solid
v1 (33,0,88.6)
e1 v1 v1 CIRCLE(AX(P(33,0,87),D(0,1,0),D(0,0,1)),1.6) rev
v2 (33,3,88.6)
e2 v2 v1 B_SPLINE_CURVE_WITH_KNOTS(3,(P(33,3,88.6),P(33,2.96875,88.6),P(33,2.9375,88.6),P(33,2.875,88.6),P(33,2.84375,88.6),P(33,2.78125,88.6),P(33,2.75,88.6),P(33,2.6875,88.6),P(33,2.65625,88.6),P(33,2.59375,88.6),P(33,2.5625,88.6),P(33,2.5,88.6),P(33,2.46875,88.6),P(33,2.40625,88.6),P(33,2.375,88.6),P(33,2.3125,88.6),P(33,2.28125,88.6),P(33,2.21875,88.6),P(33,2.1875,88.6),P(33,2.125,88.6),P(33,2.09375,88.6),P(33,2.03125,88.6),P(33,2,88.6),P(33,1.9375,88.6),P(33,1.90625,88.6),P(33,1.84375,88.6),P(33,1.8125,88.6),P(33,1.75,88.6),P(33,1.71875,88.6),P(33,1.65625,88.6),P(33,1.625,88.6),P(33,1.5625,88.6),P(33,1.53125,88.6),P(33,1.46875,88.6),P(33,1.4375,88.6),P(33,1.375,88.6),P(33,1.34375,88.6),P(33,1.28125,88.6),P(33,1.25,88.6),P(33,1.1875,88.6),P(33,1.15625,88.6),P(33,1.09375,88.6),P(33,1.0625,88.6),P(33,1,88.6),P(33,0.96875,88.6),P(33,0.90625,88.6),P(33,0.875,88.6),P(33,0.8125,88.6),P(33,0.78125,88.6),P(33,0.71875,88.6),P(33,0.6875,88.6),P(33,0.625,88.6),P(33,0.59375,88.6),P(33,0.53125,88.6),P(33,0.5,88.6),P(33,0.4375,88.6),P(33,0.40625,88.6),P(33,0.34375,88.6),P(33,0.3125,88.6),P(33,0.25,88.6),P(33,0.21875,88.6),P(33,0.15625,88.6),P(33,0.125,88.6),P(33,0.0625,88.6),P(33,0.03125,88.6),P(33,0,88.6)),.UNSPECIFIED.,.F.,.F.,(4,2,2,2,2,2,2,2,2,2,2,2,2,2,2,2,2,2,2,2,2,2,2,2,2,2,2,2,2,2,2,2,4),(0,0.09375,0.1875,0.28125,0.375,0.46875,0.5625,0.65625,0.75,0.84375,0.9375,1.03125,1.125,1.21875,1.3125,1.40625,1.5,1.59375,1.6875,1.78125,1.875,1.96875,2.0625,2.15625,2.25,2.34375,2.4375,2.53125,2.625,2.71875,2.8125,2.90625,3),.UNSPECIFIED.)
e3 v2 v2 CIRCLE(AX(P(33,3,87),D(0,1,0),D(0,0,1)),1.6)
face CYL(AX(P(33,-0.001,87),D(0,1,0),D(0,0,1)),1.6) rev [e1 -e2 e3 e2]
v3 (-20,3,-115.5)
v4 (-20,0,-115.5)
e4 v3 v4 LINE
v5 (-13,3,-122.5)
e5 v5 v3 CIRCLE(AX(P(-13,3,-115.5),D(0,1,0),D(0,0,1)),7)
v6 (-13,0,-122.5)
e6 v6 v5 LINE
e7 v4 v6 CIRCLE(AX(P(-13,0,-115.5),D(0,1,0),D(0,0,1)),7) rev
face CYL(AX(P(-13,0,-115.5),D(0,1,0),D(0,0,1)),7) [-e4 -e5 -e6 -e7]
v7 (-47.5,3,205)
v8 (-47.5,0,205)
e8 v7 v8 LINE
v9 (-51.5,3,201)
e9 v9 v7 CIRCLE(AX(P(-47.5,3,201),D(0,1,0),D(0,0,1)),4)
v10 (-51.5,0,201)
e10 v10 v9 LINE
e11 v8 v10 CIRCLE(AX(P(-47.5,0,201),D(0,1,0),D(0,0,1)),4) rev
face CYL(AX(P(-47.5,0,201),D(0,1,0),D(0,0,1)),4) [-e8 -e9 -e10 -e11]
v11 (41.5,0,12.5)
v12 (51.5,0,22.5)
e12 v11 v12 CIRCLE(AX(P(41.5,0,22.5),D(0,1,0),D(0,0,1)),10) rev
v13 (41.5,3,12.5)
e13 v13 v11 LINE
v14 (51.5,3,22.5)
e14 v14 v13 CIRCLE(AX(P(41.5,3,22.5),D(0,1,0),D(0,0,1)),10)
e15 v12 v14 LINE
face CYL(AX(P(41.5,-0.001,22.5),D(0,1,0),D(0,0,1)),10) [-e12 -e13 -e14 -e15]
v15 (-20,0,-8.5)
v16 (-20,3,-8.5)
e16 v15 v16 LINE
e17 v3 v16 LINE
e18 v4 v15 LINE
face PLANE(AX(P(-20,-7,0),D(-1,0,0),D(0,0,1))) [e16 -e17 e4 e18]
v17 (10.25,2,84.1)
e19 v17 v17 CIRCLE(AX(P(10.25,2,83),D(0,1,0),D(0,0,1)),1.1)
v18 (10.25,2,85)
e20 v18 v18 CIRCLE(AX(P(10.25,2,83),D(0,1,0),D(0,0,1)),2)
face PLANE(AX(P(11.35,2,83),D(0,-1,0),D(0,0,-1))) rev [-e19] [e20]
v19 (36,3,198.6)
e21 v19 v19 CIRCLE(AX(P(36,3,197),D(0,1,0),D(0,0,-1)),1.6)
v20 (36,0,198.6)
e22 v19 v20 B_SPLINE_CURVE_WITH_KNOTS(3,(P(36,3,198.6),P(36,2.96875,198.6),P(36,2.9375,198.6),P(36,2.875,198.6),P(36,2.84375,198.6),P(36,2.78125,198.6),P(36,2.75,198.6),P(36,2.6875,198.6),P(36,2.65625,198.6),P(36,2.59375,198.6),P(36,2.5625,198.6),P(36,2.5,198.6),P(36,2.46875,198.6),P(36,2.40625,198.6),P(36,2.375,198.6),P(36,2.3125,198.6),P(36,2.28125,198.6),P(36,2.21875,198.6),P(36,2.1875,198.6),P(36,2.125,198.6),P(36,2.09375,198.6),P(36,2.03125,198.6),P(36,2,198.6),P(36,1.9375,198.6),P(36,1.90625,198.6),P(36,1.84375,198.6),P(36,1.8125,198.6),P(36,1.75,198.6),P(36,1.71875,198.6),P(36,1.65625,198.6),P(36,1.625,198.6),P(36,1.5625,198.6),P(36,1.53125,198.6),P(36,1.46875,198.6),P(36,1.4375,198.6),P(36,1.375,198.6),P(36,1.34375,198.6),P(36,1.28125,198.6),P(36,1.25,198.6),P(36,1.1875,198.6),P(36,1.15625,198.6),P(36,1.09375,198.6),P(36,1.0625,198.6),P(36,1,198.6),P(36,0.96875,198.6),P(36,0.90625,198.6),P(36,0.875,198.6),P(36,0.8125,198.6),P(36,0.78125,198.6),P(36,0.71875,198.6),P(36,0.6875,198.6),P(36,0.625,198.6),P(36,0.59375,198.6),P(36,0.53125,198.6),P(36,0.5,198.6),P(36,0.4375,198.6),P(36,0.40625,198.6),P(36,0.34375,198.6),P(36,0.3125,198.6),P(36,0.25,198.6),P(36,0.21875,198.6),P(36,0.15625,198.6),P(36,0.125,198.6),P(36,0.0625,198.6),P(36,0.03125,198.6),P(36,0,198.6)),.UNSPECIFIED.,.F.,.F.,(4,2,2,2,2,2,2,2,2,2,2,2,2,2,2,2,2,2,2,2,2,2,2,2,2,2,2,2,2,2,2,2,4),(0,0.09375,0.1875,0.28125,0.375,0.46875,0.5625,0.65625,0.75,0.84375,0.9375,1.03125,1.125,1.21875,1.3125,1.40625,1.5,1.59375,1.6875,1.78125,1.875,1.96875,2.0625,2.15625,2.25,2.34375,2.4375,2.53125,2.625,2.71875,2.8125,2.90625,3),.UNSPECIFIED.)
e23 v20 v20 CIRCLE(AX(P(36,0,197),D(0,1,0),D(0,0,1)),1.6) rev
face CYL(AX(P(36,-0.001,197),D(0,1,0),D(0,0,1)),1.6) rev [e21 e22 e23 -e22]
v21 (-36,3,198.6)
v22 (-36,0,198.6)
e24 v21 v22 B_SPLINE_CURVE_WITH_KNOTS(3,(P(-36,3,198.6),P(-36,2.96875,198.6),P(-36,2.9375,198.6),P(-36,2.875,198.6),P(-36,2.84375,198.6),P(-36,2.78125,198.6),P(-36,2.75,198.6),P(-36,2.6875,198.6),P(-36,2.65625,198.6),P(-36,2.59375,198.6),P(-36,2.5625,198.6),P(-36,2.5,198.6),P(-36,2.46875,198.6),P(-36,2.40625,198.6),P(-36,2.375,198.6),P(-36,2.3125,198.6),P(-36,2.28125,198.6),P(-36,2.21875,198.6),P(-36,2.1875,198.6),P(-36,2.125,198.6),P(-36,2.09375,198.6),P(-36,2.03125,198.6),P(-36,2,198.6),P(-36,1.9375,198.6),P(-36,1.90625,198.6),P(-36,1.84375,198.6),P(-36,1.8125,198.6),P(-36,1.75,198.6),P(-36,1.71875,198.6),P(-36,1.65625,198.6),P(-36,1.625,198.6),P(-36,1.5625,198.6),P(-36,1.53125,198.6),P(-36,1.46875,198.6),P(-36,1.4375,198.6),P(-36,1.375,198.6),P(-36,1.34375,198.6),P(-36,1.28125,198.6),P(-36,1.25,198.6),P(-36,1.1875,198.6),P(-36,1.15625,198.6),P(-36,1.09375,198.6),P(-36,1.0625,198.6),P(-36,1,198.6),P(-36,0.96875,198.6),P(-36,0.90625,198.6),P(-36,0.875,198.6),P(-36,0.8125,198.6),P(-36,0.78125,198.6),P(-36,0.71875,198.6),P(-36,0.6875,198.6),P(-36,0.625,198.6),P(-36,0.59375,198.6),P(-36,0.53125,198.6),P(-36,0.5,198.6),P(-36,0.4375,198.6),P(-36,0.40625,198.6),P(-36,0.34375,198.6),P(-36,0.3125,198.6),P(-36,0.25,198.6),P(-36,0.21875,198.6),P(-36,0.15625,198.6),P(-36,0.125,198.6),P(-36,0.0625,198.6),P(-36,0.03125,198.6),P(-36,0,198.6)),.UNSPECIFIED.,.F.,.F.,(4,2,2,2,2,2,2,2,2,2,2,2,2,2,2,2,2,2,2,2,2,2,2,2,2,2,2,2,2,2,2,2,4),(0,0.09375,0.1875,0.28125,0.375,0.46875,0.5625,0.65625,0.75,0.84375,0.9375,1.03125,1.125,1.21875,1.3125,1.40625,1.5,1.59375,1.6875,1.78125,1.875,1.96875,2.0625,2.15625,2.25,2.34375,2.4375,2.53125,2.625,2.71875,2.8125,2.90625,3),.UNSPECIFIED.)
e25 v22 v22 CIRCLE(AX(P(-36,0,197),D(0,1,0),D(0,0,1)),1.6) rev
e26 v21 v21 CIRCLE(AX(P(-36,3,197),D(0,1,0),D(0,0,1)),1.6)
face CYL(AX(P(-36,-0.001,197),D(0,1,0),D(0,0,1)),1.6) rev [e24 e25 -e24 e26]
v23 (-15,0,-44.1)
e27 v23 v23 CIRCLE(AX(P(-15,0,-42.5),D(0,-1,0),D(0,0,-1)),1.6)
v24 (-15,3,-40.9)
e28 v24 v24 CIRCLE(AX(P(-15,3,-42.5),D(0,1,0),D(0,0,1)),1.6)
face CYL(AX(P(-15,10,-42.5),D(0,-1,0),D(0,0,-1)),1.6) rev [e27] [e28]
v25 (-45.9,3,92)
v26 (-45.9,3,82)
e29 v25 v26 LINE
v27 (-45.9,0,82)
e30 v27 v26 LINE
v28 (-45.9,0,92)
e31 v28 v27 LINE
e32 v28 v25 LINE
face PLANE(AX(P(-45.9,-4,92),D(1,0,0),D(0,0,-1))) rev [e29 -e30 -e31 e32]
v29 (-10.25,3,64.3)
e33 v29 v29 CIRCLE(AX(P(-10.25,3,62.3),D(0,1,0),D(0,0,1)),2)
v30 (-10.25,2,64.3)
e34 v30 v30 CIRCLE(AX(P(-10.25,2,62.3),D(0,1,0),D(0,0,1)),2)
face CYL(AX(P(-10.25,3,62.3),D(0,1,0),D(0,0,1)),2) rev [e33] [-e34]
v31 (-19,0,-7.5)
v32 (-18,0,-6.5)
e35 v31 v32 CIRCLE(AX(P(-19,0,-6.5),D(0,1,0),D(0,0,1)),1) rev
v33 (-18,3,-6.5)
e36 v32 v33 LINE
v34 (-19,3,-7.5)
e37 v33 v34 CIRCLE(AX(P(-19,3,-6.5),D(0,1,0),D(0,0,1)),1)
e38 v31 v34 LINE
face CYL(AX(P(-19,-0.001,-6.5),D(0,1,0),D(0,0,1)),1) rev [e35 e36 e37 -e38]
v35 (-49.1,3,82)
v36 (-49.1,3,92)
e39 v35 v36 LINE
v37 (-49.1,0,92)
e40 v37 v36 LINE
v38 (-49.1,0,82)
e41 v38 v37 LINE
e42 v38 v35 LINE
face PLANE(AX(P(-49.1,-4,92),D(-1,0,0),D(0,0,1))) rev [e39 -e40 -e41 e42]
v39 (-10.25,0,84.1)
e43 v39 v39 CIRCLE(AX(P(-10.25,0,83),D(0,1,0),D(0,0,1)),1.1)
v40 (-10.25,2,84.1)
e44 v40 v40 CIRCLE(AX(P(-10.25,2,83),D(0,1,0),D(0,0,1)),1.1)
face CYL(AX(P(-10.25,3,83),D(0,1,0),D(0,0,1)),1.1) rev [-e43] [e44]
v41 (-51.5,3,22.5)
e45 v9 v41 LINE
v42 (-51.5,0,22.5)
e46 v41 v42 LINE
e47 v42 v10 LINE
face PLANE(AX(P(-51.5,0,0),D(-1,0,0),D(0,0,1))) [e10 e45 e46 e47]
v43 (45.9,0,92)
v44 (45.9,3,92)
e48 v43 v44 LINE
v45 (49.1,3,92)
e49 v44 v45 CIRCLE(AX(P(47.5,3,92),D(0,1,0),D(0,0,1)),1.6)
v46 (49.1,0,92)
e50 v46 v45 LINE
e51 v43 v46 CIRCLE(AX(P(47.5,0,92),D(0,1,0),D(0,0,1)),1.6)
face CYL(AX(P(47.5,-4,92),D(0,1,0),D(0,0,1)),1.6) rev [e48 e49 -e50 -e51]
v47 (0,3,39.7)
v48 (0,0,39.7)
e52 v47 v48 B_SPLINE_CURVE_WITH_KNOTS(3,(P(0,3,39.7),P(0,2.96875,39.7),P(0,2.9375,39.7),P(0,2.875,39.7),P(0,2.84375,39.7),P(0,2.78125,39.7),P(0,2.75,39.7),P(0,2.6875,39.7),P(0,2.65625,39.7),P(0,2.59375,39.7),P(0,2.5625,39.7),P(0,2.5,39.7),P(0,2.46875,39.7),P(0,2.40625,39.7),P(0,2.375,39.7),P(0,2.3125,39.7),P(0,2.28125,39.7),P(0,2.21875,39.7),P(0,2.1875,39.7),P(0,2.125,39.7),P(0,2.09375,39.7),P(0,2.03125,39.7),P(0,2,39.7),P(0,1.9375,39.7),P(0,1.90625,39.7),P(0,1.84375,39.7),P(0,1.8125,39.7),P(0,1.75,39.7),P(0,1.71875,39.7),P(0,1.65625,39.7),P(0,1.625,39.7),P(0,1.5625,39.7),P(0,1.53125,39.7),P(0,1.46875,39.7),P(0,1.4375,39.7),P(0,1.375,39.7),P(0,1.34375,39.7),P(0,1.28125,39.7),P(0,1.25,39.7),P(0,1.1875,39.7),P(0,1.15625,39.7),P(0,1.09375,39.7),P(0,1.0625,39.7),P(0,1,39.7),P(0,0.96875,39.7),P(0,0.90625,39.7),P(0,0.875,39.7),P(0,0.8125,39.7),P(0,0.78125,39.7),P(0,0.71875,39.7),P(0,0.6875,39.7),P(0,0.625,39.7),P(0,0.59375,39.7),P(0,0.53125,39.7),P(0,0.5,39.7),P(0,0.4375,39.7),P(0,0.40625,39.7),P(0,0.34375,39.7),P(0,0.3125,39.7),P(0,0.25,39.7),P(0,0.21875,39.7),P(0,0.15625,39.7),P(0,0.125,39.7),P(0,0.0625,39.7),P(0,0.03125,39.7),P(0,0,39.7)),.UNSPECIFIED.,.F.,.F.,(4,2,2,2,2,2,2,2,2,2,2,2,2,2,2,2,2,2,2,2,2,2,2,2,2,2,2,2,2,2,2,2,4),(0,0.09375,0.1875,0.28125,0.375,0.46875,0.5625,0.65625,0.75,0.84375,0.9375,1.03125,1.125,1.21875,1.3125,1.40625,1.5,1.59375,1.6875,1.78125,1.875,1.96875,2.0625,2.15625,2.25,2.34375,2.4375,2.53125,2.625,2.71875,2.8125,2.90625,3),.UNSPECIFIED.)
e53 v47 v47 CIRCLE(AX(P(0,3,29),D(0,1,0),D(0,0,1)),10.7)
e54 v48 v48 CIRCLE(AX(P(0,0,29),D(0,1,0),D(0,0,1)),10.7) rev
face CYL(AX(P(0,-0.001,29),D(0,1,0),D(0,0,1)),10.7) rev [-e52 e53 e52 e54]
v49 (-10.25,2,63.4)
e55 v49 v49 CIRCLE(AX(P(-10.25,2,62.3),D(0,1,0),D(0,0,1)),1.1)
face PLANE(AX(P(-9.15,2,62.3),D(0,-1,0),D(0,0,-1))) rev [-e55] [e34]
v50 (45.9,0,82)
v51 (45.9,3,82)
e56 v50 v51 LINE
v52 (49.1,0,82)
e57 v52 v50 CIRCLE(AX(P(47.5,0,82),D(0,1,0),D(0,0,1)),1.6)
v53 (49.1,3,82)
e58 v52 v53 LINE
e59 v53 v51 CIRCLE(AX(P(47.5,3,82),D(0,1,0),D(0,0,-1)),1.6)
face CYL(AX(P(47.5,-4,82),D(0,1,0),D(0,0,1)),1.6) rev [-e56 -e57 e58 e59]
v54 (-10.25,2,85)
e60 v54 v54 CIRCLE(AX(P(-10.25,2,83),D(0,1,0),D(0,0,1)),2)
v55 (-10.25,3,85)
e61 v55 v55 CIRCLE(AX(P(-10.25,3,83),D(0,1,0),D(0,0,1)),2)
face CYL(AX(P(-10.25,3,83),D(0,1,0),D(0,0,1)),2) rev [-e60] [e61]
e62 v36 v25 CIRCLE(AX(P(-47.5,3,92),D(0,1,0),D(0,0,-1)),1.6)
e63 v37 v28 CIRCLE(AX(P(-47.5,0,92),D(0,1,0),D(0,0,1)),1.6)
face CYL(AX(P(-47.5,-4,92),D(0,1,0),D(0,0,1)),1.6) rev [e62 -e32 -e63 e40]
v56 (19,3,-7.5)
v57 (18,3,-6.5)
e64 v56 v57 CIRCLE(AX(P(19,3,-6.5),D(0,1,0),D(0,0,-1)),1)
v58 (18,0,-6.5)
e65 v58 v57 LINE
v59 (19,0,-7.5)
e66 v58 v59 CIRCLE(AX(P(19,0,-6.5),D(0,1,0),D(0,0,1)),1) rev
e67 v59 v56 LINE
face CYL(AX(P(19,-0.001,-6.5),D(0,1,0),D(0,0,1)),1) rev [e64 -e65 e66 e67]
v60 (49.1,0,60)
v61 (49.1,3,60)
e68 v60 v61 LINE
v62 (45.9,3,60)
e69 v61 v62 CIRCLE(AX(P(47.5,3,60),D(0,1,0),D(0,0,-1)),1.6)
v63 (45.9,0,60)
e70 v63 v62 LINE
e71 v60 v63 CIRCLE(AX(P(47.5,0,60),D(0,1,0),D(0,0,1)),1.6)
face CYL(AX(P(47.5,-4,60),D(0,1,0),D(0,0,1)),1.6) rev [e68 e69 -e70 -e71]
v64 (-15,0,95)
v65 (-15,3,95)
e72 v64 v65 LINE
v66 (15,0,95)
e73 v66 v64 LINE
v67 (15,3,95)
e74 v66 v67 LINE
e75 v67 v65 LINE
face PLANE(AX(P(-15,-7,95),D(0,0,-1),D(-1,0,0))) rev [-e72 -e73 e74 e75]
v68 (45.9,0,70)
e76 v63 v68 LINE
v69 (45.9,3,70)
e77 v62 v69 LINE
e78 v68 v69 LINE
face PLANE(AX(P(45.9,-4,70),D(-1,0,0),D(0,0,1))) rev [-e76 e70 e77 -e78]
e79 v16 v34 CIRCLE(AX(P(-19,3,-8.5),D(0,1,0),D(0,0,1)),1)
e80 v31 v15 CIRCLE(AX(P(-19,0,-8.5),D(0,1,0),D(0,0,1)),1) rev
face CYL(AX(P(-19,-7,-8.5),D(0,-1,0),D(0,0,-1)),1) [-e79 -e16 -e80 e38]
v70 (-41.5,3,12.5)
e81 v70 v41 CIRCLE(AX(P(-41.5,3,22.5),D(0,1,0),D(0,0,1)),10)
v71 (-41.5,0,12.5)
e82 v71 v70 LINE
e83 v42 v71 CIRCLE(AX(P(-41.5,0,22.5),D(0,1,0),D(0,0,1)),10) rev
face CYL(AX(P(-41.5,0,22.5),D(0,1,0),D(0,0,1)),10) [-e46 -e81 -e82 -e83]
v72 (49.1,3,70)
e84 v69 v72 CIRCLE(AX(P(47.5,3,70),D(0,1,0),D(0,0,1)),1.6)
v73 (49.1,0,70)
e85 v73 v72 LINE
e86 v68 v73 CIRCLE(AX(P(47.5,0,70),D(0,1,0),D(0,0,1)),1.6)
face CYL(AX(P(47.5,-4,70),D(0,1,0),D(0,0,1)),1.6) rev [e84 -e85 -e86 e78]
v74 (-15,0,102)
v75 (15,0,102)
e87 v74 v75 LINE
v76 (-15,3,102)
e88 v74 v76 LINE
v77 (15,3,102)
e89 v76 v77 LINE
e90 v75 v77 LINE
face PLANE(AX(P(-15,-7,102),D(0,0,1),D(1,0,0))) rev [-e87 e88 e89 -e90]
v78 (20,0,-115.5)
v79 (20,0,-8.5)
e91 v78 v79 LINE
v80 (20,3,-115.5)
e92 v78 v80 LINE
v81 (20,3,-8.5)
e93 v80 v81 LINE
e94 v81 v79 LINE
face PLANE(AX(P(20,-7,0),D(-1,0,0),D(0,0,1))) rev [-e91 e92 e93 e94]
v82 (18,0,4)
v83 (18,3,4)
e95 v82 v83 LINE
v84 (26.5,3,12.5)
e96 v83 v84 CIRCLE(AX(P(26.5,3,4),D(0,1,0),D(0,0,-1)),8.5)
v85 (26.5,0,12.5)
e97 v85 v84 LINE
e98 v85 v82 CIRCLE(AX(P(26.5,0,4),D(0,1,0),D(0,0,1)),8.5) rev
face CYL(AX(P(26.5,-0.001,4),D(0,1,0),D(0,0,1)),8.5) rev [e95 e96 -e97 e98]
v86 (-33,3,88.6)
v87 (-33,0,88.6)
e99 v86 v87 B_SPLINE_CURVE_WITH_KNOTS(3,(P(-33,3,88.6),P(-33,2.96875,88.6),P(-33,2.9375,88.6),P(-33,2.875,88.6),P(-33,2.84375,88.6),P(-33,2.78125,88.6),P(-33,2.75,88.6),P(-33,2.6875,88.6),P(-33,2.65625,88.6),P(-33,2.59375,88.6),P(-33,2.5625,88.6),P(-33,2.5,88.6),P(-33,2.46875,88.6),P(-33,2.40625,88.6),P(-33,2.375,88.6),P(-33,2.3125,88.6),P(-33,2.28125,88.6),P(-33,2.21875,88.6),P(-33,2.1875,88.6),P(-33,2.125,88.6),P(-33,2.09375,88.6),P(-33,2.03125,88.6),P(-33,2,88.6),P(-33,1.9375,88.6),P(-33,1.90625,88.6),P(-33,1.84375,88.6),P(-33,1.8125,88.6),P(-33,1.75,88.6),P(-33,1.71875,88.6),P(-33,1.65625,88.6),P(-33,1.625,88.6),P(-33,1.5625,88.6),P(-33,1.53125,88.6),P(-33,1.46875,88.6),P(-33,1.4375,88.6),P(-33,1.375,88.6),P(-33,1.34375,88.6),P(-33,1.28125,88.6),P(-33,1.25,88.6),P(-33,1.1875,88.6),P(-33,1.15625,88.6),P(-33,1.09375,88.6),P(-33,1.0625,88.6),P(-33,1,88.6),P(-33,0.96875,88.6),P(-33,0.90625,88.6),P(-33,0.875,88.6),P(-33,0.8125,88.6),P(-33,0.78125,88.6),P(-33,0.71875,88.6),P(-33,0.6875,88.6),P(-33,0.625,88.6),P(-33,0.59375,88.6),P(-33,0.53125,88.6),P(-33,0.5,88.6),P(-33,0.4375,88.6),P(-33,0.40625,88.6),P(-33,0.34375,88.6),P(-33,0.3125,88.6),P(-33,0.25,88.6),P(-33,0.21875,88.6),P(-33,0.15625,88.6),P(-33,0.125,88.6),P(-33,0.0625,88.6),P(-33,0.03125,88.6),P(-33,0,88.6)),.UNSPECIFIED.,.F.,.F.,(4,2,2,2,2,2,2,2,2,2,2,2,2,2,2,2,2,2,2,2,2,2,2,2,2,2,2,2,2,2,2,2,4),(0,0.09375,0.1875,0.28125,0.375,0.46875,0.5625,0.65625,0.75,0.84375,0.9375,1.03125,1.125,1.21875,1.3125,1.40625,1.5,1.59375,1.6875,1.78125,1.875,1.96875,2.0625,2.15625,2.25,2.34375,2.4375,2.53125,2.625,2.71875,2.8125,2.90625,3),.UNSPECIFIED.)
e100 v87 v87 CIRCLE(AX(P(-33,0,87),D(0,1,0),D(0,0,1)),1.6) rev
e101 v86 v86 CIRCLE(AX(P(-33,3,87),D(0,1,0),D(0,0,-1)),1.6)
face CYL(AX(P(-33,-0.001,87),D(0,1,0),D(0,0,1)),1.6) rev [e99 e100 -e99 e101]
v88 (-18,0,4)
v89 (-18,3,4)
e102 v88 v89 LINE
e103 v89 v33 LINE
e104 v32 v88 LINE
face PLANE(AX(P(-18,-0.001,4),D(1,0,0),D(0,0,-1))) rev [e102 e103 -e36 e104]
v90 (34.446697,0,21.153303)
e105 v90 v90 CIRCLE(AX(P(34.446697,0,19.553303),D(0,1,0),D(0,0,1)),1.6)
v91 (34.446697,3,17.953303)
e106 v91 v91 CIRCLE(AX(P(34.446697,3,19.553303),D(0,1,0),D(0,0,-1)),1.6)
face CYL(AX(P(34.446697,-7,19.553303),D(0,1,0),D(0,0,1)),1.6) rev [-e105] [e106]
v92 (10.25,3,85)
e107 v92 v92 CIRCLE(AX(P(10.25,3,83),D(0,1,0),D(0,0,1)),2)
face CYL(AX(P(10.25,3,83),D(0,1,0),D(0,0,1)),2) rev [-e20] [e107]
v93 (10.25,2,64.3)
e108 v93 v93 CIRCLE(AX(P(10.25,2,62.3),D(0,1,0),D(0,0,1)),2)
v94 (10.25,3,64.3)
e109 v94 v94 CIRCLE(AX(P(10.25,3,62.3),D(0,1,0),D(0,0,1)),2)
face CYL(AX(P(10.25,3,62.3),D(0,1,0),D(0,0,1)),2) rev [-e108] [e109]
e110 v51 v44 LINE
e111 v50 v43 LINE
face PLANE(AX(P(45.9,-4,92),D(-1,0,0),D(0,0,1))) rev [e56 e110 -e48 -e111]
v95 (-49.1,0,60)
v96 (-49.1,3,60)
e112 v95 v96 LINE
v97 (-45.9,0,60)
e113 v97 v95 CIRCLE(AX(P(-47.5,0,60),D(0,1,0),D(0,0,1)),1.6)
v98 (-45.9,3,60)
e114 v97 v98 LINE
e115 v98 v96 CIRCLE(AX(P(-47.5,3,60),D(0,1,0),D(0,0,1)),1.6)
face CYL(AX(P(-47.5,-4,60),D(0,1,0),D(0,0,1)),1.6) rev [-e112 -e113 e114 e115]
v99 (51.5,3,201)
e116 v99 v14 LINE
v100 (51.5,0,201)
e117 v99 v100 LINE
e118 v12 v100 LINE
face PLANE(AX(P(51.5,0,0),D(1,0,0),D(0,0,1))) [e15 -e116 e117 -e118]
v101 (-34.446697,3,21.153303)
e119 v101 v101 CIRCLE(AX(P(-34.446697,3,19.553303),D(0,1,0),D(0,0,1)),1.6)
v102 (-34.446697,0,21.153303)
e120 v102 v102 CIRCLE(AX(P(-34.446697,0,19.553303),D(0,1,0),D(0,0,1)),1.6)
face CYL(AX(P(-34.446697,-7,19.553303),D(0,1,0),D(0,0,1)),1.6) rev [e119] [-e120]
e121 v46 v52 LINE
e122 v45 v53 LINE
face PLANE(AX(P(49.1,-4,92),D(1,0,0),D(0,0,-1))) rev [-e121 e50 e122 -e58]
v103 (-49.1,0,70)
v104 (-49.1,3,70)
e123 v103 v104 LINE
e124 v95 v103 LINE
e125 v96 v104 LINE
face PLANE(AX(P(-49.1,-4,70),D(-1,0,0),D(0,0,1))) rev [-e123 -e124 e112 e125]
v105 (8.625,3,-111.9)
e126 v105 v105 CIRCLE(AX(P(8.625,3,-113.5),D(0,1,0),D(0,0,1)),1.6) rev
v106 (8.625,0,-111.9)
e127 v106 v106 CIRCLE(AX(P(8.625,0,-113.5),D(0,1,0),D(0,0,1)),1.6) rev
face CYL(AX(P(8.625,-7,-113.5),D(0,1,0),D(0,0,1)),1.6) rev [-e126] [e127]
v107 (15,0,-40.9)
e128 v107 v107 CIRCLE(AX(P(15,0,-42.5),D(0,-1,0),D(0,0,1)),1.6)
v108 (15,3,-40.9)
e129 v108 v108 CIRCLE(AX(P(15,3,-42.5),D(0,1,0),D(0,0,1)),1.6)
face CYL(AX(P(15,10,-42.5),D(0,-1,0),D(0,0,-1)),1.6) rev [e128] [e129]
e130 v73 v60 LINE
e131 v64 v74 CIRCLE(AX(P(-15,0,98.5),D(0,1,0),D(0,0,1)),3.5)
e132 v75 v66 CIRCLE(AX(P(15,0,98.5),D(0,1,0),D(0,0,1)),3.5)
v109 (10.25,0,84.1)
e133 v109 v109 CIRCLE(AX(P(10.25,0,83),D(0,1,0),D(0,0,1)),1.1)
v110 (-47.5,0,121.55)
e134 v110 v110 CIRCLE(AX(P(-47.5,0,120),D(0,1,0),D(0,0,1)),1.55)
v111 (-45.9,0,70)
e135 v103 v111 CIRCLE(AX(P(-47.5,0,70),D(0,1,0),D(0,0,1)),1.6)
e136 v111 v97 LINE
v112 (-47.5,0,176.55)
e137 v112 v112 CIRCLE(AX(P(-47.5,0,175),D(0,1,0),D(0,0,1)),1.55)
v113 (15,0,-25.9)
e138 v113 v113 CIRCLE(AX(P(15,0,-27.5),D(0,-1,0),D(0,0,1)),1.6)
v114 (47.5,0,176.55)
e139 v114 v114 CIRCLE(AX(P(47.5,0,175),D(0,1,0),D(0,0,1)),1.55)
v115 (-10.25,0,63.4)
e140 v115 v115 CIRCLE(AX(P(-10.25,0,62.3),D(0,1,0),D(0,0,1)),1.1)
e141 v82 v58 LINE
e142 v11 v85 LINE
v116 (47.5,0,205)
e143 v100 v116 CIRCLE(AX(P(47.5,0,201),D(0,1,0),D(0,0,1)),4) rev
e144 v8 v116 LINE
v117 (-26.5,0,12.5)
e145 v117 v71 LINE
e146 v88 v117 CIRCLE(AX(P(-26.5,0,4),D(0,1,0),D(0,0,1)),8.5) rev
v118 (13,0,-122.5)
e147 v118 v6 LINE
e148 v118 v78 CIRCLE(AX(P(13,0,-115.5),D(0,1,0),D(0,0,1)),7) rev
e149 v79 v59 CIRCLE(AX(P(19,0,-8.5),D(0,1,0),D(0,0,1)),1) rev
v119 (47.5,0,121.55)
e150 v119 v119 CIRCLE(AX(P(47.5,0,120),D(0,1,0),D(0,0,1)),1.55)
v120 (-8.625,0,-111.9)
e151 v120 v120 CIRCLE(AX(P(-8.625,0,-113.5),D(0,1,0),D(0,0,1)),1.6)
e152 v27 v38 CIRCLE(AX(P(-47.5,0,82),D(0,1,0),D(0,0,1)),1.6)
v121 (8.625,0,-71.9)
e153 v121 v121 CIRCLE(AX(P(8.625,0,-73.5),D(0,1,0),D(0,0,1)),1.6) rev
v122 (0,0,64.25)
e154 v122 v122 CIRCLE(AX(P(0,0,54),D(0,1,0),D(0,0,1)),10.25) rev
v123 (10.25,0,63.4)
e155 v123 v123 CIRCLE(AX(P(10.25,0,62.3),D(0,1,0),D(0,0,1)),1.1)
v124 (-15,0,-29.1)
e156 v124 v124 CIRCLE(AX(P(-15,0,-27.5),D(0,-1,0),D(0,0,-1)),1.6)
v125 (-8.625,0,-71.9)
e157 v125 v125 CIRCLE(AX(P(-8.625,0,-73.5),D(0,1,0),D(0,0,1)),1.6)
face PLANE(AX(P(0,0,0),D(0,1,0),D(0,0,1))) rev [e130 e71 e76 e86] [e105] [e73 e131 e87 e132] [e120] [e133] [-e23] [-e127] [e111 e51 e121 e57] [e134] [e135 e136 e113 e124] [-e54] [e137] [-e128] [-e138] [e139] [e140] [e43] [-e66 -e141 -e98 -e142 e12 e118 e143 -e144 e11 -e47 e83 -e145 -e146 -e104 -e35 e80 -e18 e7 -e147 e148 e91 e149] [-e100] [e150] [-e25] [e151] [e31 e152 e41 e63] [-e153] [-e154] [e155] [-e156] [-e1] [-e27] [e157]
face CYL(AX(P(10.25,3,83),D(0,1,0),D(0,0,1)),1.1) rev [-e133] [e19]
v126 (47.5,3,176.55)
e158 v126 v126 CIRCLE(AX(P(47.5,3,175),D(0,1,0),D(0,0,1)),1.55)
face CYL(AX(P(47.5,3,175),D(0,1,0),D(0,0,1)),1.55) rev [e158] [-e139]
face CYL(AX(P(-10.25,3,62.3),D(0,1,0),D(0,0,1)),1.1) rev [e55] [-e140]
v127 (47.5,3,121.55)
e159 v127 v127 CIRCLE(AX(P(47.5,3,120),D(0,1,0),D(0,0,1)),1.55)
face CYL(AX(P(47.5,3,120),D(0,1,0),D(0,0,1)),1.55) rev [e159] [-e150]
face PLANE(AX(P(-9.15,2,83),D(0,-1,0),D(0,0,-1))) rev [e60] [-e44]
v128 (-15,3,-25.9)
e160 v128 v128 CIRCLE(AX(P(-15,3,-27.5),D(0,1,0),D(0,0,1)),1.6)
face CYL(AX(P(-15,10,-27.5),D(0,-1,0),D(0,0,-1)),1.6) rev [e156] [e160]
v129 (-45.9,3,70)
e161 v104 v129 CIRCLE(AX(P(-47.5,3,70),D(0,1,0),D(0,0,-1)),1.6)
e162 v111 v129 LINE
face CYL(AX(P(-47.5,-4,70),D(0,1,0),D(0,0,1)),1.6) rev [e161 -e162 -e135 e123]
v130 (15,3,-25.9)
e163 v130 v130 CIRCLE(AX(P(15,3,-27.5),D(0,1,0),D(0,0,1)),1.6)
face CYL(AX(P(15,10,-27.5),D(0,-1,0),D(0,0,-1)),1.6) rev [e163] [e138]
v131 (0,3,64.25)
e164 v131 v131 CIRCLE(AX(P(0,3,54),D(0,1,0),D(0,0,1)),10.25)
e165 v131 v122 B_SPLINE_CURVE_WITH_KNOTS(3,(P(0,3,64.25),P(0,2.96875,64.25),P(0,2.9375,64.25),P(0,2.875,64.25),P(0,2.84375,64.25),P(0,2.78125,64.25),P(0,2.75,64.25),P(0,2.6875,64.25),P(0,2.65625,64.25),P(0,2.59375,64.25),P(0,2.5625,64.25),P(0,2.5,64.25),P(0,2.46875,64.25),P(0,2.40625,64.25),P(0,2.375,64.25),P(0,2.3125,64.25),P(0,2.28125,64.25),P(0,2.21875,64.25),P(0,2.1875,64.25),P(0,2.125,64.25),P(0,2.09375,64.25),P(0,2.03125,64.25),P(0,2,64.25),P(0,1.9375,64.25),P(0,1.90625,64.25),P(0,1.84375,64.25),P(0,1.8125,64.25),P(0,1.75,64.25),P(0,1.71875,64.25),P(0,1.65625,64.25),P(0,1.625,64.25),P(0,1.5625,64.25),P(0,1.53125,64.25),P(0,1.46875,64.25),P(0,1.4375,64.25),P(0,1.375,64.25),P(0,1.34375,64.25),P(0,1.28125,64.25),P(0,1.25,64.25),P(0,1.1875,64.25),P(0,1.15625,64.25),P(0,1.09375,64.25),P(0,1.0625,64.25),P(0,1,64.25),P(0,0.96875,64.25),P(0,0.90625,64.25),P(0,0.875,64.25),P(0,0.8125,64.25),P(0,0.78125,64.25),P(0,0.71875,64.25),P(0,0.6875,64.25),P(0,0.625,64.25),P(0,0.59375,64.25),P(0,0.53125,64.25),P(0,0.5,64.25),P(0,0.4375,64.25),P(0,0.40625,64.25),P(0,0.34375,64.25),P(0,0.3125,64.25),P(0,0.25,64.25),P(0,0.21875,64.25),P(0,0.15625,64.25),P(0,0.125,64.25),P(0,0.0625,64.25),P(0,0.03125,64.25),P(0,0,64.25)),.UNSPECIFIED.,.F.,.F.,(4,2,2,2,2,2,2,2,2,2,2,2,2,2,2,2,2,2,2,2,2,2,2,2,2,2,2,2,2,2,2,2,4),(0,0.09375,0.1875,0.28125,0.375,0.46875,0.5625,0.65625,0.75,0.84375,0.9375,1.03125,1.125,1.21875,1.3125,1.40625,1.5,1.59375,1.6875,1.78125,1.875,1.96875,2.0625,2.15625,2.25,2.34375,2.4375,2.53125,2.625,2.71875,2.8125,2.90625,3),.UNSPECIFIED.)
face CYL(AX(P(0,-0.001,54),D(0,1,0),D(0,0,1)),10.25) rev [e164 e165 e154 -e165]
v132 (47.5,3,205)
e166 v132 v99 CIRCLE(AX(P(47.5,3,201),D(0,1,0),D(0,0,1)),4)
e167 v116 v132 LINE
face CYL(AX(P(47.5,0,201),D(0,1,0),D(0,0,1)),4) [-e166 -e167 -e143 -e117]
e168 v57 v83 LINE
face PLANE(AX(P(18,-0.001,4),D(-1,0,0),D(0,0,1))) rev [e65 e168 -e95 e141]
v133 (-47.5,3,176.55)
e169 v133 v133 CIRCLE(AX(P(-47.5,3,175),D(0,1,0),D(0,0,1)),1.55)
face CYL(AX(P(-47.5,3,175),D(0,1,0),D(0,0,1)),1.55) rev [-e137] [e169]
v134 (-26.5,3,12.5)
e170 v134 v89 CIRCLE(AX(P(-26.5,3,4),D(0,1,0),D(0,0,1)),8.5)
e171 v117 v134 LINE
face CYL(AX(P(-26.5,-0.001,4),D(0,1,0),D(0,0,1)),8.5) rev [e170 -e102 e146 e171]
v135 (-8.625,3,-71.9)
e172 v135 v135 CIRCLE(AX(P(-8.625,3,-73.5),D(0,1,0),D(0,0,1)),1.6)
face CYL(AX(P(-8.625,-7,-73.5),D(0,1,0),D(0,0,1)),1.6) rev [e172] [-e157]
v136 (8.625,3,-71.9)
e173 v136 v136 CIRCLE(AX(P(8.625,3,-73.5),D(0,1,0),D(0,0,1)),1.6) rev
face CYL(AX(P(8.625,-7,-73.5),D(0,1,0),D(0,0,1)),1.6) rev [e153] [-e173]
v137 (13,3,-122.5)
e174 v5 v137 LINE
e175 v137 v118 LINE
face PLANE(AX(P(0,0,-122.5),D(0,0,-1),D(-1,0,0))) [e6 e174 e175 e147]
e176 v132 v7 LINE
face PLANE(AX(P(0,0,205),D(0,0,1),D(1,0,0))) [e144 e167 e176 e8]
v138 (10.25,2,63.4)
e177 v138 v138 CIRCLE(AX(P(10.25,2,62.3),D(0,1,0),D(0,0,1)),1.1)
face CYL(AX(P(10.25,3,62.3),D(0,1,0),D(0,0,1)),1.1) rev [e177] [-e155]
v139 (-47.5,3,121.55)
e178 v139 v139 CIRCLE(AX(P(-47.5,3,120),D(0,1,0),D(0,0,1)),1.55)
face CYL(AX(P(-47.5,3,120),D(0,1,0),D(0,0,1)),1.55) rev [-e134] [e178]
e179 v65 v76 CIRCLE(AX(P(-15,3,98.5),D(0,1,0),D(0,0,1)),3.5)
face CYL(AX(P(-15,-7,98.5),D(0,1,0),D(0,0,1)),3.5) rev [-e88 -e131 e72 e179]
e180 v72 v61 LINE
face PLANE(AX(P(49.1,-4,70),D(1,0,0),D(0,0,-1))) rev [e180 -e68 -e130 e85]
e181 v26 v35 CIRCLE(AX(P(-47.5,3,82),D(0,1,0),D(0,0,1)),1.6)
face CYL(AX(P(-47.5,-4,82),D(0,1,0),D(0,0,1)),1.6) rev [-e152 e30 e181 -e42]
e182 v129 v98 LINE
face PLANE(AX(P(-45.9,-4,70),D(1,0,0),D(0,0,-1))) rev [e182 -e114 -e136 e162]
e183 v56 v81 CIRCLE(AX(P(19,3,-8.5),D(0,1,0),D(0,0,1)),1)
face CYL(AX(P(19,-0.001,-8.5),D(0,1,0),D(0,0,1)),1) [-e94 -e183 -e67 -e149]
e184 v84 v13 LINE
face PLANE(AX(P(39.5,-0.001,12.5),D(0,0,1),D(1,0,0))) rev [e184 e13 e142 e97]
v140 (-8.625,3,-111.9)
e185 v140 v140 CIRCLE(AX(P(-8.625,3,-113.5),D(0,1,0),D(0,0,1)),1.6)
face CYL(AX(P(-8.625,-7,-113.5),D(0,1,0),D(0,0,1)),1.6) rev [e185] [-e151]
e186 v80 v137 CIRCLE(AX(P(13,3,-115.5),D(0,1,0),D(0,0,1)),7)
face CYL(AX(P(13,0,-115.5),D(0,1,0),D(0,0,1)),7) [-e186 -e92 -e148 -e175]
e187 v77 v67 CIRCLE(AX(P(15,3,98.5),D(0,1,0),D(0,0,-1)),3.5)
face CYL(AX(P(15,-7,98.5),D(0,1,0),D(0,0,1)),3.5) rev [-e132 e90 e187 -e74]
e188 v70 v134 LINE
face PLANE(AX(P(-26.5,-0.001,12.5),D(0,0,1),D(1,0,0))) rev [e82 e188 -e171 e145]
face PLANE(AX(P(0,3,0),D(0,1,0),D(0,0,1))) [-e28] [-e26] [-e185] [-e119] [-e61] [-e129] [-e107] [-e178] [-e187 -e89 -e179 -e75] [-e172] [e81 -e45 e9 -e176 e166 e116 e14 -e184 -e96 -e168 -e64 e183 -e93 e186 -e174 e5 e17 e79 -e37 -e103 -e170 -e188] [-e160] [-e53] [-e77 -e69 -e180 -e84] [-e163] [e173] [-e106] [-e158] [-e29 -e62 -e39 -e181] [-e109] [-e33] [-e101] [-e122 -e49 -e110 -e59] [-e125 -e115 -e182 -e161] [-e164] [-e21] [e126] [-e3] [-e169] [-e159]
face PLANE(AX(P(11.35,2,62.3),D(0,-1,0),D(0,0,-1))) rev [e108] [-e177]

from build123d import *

# Parameters (mm, degrees)
SKETCH_1_W                = 200
SKETCH_1_H                = 200
EXTRUDE_1_DEPTH           = 3
SKETCH_2_R                = 1.5
CUT_EXTRUDE_2_DEPTH       = 10
CUT_EXTRUDE_3_DEPTH       = 10
SKETCH_6_R                = 1.6
CUT_EXTRUDE_3_1_1_DEPTH   = 10
CUT_EXTRUDE_6_REACH       = 111.495
SKETCH_11_R               = 1.5
CUT_EXTRUDE_21_4_REACH    = 111.495
SKETCH_4_R                = 10.7
FILLET_1_R                = 1
SKETCH_12_W               = 40
SKETCH_12_H               = 3
EXTRUDE_2_DEPTH           = 75
FILLET_2_R                = 7
SKETCH_13_R               = 1.6
CUT_EXTRUDE_3_2_3_DEPTH   = 10
SKETCH_19_W               = 89
SKETCH_19_H               = 3
EXTRUDE_3_DEPTH           = 105
CUT_EXTRUDE_7519_REACH    = 211.796
SKETCH_14_R               = 10.25
HOLE_WIZARD_1_D           = 2.2
HOLE_WIZARD_1_CBORE_D     = 4
HOLE_WIZARD_1_CBORE_DEPTH = 1
CUT_EXTRUDE_8_REACH       = 211.796
SKETCH_23_R               = 1.6
SKETCH_24_W               = 192.5
SKETCH_24_H               = 3
EXTRUDE_4_DEPTH           = 7
FILLET_3_R                = 10
CUT_EXTRUDE_10527_DEPTH   = 7
CUT_EXTRUDE_7_REACH       = 213.391
SKETCH_22_R               = 1.6
SKETCH_16_R               = 1.6
CUT_EXTRUDE_9_DEPTH       = 10
CUT_EXTRUDE_13046_DEPTH   = 10
HOLE_WIZARD_3_1_3_1_1_D   = 3.1
FILLET_4_R                = 4


with BuildPart() as part:
    # 草图1 → 凸台-拉伸1 (new body)
    with BuildSketch(Plane(origin=(0, 0, 0), x_dir=(1, 0, 0), z_dir=(0, 1, 0))):
        Rectangle(SKETCH_1_W, SKETCH_1_H)
    extrude(amount=EXTRUDE_1_DEPTH)

    # 草图2 → 切除-拉伸2 (cut)
    with BuildSketch(Plane(origin=(0, 3, 0), x_dir=(1, 0, 0), z_dir=(0, 1, 0))):
        with Locations(Location((29.5, 9.5, 0), (0, 0, 270))):
            Circle(SKETCH_2_R)
        with Locations(Location((21.5, 0, 0), (0, 0, 270))):
            Circle(SKETCH_2_R)
        with Locations(Location((29.5, -9.5, 0), (0, 0, 270))):
            Circle(SKETCH_2_R)
        with Locations(Location((37.5, 0, 0), (0, 0, 270))):
            Circle(SKETCH_2_R)
        with Locations(Location((-29.5, -9.5, 0), (0, 0, 270))):
            Circle(SKETCH_2_R)
        with Locations(Location((-37.5, 0, 0), (0, 0, 270))):
            Circle(SKETCH_2_R)
        with Locations(Location((-21.5, 0, 0), (0, 0, 270))):
            Circle(SKETCH_2_R)
        with Locations(Location((-29.5, 9.5, 0), (0, 0, 270))):
            Circle(SKETCH_2_R)
    extrude(amount=-CUT_EXTRUDE_2_DEPTH, mode=Mode.SUBTRACT)

    # 草图5 → 切除-拉伸3 (cut)
    with BuildSketch(Plane(origin=(0, 3, 0), x_dir=(1, 0, 0), z_dir=(0, 1, 0))):
        with BuildLine():
            Line((-100, -100), (-44.5, -100))
            Line((-44.5, -100), (-44.5, 0))
            ThreePointArc((-44.5, 0), (-40.212142643, 10.5), (-29.8, 14.9969997))
            ThreePointArc((-29.8, 14.9969997), (-22.858571571, 17.9949995), (-20, 24.9949995))
            Line((-20, 24.9949995), (-20, 47.5))
            Line((-20, 47.5), (0, 47.5))
            Line((0, 47.5), (20, 47.5))
            Line((20, 47.5), (20, 24.9949995))
            ThreePointArc((20, 24.9949995), (22.858571571, 17.9949995), (29.8, 14.9969997))
            ThreePointArc((29.8, 14.9969997), (40.212142643, 10.5), (44.5, 0))
            Line((44.5, 0), (44.5, -100))
            Line((44.5, -100), (100, -100))
            Line((100, -100), (100, 100))
            Line((100, 100), (-100, 100))
            Line((-100, 100), (-100, -100))
        make_face()
    extrude(amount=-CUT_EXTRUDE_3_DEPTH, mode=Mode.SUBTRACT)

    # 草图6 → φ3.1通孔1 (cut)
    with BuildSketch(Plane.XZ):
        with Locations(Location((-15, -42.5, 0), (0, 0, 270))):
            Circle(SKETCH_6_R)
        with Locations(Location((-15, -27.5, 0), (0, 0, 270))):
            Circle(SKETCH_6_R)
        with Locations(Location((15, -27.5, 0), (0, 0, 90))):
            Circle(SKETCH_6_R)
        with Locations(Location((15, -42.5, 0), (0, 0, 90))):
            Circle(SKETCH_6_R)
    extrude(amount=-CUT_EXTRUDE_3_1_1_DEPTH, mode=Mode.SUBTRACT)

    # 草图11 → 切除-拉伸6 (cut, up to next)
    with BuildSketch(Plane(origin=(0, 3, 0), x_dir=(1, 0, 0), z_dir=(0, 1, 0)), mode=Mode.PRIVATE) as cut_extrude_6_sk1:
        with BuildLine():
            Line((44.5, -17.5), (44.5, -100))
            Line((44.5, -100), (101.133062566, -100))
            Line((101.133062566, -100), (101.133062566, 47.5))
            Line((101.133062566, 47.5), (20, 47.5))
            Line((20, 47.5), (20, 7.5))
            Line((20, 7.5), (19, 7.5))
            ThreePointArc((19, 7.5), (18.292893219, 7.207106781), (18, 6.5))
            Line((18, 6.5), (18, -4))
            ThreePointArc((18, -4), (20.48959236, -10.01040764), (26.5, -12.5))
            Line((26.5, -12.5), (39.5, -12.5))
            Line((39.5, -12.5), (44.5, -12.5))
            Line((44.5, -12.5), (44.5, -17.5))
        make_face()
        with Locations((29.5, -9.5)):
            Circle(SKETCH_11_R, mode=Mode.SUBTRACT)
        with Locations((21.5, 0)):
            Circle(SKETCH_11_R, mode=Mode.SUBTRACT)
    cut_extrude_6_tool1 = extrude(cut_extrude_6_sk1.sketch, amount=-CUT_EXTRUDE_6_REACH, mode=Mode.PRIVATE) & part.part
    # 草图11 → 切除-拉伸6 (cut, up to next)
    with BuildSketch(Plane(origin=(0, 3, 0), x_dir=(1, 0, 0), z_dir=(0, 1, 0)), mode=Mode.PRIVATE) as cut_extrude_6_sk2:
        with BuildLine():
            Line((-44.5, -17.5), (-44.5, -100))
            Line((-44.5, -100), (-101.133062566, -100))
            Line((-101.133062566, -100), (-101.133062566, 47.5))
            Line((-101.133062566, 47.5), (-20, 47.5))
            Line((-20, 47.5), (-20, 7.5))
            Line((-20, 7.5), (-19, 7.5))
            ThreePointArc((-19, 7.5), (-18.292893219, 7.207106781), (-18, 6.5))
            Line((-18, 6.5), (-18, -4))
            ThreePointArc((-18, -4), (-20.48959236, -10.01040764), (-26.5, -12.5))
            Line((-26.5, -12.5), (-39.5, -12.5))
            Line((-39.5, -12.5), (-44.5, -12.5))
            Line((-44.5, -12.5), (-44.5, -17.5))
        make_face()
    cut_extrude_6_tool2 = extrude(cut_extrude_6_sk2.sketch, amount=-CUT_EXTRUDE_6_REACH, mode=Mode.PRIVATE) & part.part
    add(cut_extrude_6_tool1.solids().sort_by_distance((66.686037, 3, 19.669577))[0], mode=Mode.SUBTRACT)
    add(cut_extrude_6_tool2.solids().sort_by_distance((-66.626911, 3, 19.648158))[0], mode=Mode.SUBTRACT)

    # 草图4 → φ21.4落弹孔 (cut, up to next)
    with BuildSketch(Plane(origin=(0, 3, 0), x_dir=(1, 0, 0), z_dir=(0, 1, 0)), mode=Mode.PRIVATE) as cut_extrude_21_4_sk1:
        with Locations(Location((0, -29, 0), (0, 0, 270))):
            Circle(SKETCH_4_R)
    cut_extrude_21_4_tool1 = extrude(cut_extrude_21_4_sk1.sketch, amount=-CUT_EXTRUDE_21_4_REACH, mode=Mode.PRIVATE) & part.part
    add(cut_extrude_21_4_tool1.solids().sort_by_distance((0, 3, 29))[0], mode=Mode.SUBTRACT)

    # 圆角1
    fillet_1_edges = [part.edges().sort_by_distance(p)[0] for p in [
        (-20, 1.5, -7.5),
        (20, 1.5, -7.5),
    ]]
    fillet(fillet_1_edges, radius=FILLET_1_R - 0.0001)  # a hair under: the kernel refuses the full size

    # 草图12 → 凸台-拉伸2 (add)
    with BuildSketch(Plane(origin=(0, 0, -47.5), x_dir=(-1, 0, 0), z_dir=(0, 0, -1))):
        with Locations((0, 1.5)):
            Rectangle(SKETCH_12_W, SKETCH_12_H)
    extrude(amount=EXTRUDE_2_DEPTH)

    # 圆角2
    fillet_2_edges = [part.edges().sort_by_distance(p)[0] for p in [
        (20, 1.5, -122.5),
        (-20, 1.5, -122.5),
    ]]
    fillet(fillet_2_edges, radius=FILLET_2_R)

    # 草图13 → φ3.2通孔3 (cut)
    with BuildSketch(Plane(origin=(0, 3, 0), x_dir=(1, 0, 0), z_dir=(0, 1, 0))):
        with Locations(Location((-8.625, 113.5, 0), (0, 0, 270))):
            Circle(SKETCH_13_R)
        with Locations(Location((8.625, 113.5, 0), (0, 0, 270))):
            Circle(SKETCH_13_R)
        with Locations(Location((8.625, 73.5, 0), (0, 0, 270))):
            Circle(SKETCH_13_R)
        with Locations(Location((-8.625, 73.5, 0), (0, 0, 270))):
            Circle(SKETCH_13_R)
    extrude(amount=-CUT_EXTRUDE_3_2_3_DEPTH, mode=Mode.SUBTRACT)

    # 草图19 → 凸台-拉伸3 (add)
    with BuildSketch(Plane.XY.offset(100)):
        with Locations((0, 1.5)):
            Rectangle(SKETCH_19_W, SKETCH_19_H)
    extrude(amount=EXTRUDE_3_DEPTH)

    # 草图14 → Cut-Extrude 7519 (cut, up to next)
    with BuildSketch(Plane(origin=(0, 3, 0), x_dir=(1, 0, 0), z_dir=(0, 1, 0)), mode=Mode.PRIVATE) as cut_extrude_7519_sk1:
        with Locations(Location((0, -54, 0), (0, 0, 270))):
            Circle(SKETCH_14_R)
    cut_extrude_7519_tool1 = extrude(cut_extrude_7519_sk1.sketch, amount=-CUT_EXTRUDE_7519_REACH, mode=Mode.PRIVATE) & part.part
    add(cut_extrude_7519_tool1.solids().sort_by_distance((0, 3, 54))[0], mode=Mode.SUBTRACT)

    # 孔1 (through all)
    with Locations(Plane(origin=(-10.25, 3, 62.3), x_dir=(0, 0, 1), z_dir=(0, 1, 0))):
        with Locations((0, 0), (0, 20.5), (20.7, 0), (20.7, 20.5)):
            CounterBoreHole(HOLE_WIZARD_1_D / 2, HOLE_WIZARD_1_CBORE_D / 2, HOLE_WIZARD_1_CBORE_DEPTH)

    # 草图23 → 切除-拉伸8 (cut, up to next)
    with BuildSketch(Plane(origin=(0, 3, 0), x_dir=(1, 0, 0), z_dir=(0, 1, 0)), mode=Mode.PRIVATE) as cut_extrude_8_sk1:
        with Locations(Location((33, -87, 0), (0, 0, 270))):
            Circle(SKETCH_23_R)
    cut_extrude_8_tool1 = extrude(cut_extrude_8_sk1.sketch, amount=-CUT_EXTRUDE_8_REACH, mode=Mode.PRIVATE) & part.part
    # 草图23 → 切除-拉伸8 (cut, up to next)
    with BuildSketch(Plane(origin=(0, 3, 0), x_dir=(1, 0, 0), z_dir=(0, 1, 0)), mode=Mode.PRIVATE) as cut_extrude_8_sk2:
        with Locations(Location((-33, -87, 0), (0, 0, 270))):
            Circle(SKETCH_23_R)
    cut_extrude_8_tool2 = extrude(cut_extrude_8_sk2.sketch, amount=-CUT_EXTRUDE_8_REACH, mode=Mode.PRIVATE) & part.part
    add(cut_extrude_8_tool1.solids().sort_by_distance((33, 3, 87))[0], mode=Mode.SUBTRACT)
    add(cut_extrude_8_tool2.solids().sort_by_distance((-33, 3, 87))[0], mode=Mode.SUBTRACT)

    # 草图24 → 凸台-拉伸4 (add)
    with BuildSketch(Plane.ZY.offset(44.5)):
        with Locations((108.75, 1.5)):
            Rectangle(SKETCH_24_W, SKETCH_24_H)
    extrude_4 = extrude(amount=EXTRUDE_4_DEPTH)

    # 镜向2: 凸台-拉伸4 across plane
    add(extrude_4.mirror(Plane(origin=(0, 0, 0), x_dir=(0, 0, 1), z_dir=(1, 0, 0))))

    # 圆角3
    fillet_3_edges = [part.edges().sort_by_distance(p)[0] for p in [
        (-51.5, 1.5, 12.5),
        (51.5, 1.5, 12.5),
    ]]
    fillet(fillet_3_edges, radius=FILLET_3_R)

    # 草图17 → Cut-Extrude 10527 (cut)
    with BuildSketch(Plane(origin=(0, 3, 0), x_dir=(1, 0, 0), z_dir=(0, 1, 0))):
        with BuildLine():
            Line((-49.1, -70), (-49.1, -60))
            ThreePointArc((-49.1, -60), (-47.5, -58.4), (-45.9, -60))
            Line((-45.9, -60), (-45.9, -70))
            ThreePointArc((-45.9, -70), (-47.5, -71.6), (-49.1, -70))
        make_face()
        with BuildLine():
            Line((-49.1, -92), (-49.1, -82))
            ThreePointArc((-49.1, -82), (-47.5, -80.4), (-45.9, -82))
            Line((-45.9, -82), (-45.9, -92))
            ThreePointArc((-45.9, -92), (-47.5, -93.6), (-49.1, -92))
        make_face()
        with BuildLine():
            Line((45.9, -92), (45.9, -82))
            ThreePointArc((45.9, -82), (47.5, -80.4), (49.1, -82))
            Line((49.1, -82), (49.1, -92))
            ThreePointArc((49.1, -92), (47.5, -93.6), (45.9, -92))
        make_face()
        with BuildLine():
            Line((45.9, -70), (45.9, -60))
            ThreePointArc((45.9, -60), (47.5, -58.4), (49.1, -60))
            Line((49.1, -60), (49.1, -70))
            ThreePointArc((49.1, -70), (47.5, -71.6), (45.9, -70))
        make_face()
    extrude(amount=-CUT_EXTRUDE_10527_DEPTH, mode=Mode.SUBTRACT)

    # 草图22 → 切除-拉伸7 (cut, up to next)
    with BuildSketch(Plane(origin=(0, 3, 0), x_dir=(1, 0, 0), z_dir=(0, 1, 0)), mode=Mode.PRIVATE) as cut_extrude_7_sk1:
        with Locations(Location((-36, -197, 0), (0, 0, 270))):
            Circle(SKETCH_22_R)
    cut_extrude_7_tool1 = extrude(cut_extrude_7_sk1.sketch, amount=-CUT_EXTRUDE_7_REACH, mode=Mode.PRIVATE) & part.part
    # 草图22 → 切除-拉伸7 (cut, up to next)
    with BuildSketch(Plane(origin=(0, 3, 0), x_dir=(1, 0, 0), z_dir=(0, 1, 0)), mode=Mode.PRIVATE) as cut_extrude_7_sk2:
        with Locations(Location((36, -197, 0), (0, 0, 270))):
            Circle(SKETCH_22_R)
    cut_extrude_7_tool2 = extrude(cut_extrude_7_sk2.sketch, amount=-CUT_EXTRUDE_7_REACH, mode=Mode.PRIVATE) & part.part
    add(cut_extrude_7_tool1.solids().sort_by_distance((-36, 3, 197))[0], mode=Mode.SUBTRACT)
    add(cut_extrude_7_tool2.solids().sort_by_distance((36, 3, 197))[0], mode=Mode.SUBTRACT)

    # 草图16 → 切除-拉伸9 (cut)
    with BuildSketch(Plane(origin=(0, 3, 0), x_dir=(1, 0, 0), z_dir=(0, 1, 0))):
        with Locations(Location((-34.446696938, -19.553303062, 0), (0, 0, 270))):
            Circle(SKETCH_16_R)
        with Locations(Location((34.446696938, -19.553303062, 0), (0, 0, 270))):
            Circle(SKETCH_16_R)
    extrude(amount=-CUT_EXTRUDE_9_DEPTH, mode=Mode.SUBTRACT)

    # 草图25 → Cut-Extrude 13046 (cut)
    with BuildSketch(Plane(origin=(0, 3, 0), x_dir=(1, 0, 0), z_dir=(0, 1, 0))):
        with BuildLine():
            Line((-15, -95), (15, -95))
            ThreePointArc((15, -95), (18.5, -98.5), (15, -102))
            Line((15, -102), (-15, -102))
            ThreePointArc((-15, -102), (-18.5, -98.5), (-15, -95))
        make_face()
    extrude(amount=-CUT_EXTRUDE_13046_DEPTH, mode=Mode.SUBTRACT)

    # Ø3.1 (3.1) 直径孔1 (through all)
    with Locations(Plane(origin=(-47.5, 3, 120), x_dir=(0, 0, 1), z_dir=(0, 1, 0))):
        with Locations((0, 0), (0, 95), (55, 95), (55, 0)):
            Hole(HOLE_WIZARD_3_1_3_1_1_D / 2)

    # 圆角4
    fillet_4_edges = [part.edges().sort_by_distance(p)[0] for p in [
        (-51.5, 1.5, 205),
        (51.5, 1.5, 205),
    ]]
    fillet(fillet_4_edges, radius=FILLET_4_R)


solid = part.part
